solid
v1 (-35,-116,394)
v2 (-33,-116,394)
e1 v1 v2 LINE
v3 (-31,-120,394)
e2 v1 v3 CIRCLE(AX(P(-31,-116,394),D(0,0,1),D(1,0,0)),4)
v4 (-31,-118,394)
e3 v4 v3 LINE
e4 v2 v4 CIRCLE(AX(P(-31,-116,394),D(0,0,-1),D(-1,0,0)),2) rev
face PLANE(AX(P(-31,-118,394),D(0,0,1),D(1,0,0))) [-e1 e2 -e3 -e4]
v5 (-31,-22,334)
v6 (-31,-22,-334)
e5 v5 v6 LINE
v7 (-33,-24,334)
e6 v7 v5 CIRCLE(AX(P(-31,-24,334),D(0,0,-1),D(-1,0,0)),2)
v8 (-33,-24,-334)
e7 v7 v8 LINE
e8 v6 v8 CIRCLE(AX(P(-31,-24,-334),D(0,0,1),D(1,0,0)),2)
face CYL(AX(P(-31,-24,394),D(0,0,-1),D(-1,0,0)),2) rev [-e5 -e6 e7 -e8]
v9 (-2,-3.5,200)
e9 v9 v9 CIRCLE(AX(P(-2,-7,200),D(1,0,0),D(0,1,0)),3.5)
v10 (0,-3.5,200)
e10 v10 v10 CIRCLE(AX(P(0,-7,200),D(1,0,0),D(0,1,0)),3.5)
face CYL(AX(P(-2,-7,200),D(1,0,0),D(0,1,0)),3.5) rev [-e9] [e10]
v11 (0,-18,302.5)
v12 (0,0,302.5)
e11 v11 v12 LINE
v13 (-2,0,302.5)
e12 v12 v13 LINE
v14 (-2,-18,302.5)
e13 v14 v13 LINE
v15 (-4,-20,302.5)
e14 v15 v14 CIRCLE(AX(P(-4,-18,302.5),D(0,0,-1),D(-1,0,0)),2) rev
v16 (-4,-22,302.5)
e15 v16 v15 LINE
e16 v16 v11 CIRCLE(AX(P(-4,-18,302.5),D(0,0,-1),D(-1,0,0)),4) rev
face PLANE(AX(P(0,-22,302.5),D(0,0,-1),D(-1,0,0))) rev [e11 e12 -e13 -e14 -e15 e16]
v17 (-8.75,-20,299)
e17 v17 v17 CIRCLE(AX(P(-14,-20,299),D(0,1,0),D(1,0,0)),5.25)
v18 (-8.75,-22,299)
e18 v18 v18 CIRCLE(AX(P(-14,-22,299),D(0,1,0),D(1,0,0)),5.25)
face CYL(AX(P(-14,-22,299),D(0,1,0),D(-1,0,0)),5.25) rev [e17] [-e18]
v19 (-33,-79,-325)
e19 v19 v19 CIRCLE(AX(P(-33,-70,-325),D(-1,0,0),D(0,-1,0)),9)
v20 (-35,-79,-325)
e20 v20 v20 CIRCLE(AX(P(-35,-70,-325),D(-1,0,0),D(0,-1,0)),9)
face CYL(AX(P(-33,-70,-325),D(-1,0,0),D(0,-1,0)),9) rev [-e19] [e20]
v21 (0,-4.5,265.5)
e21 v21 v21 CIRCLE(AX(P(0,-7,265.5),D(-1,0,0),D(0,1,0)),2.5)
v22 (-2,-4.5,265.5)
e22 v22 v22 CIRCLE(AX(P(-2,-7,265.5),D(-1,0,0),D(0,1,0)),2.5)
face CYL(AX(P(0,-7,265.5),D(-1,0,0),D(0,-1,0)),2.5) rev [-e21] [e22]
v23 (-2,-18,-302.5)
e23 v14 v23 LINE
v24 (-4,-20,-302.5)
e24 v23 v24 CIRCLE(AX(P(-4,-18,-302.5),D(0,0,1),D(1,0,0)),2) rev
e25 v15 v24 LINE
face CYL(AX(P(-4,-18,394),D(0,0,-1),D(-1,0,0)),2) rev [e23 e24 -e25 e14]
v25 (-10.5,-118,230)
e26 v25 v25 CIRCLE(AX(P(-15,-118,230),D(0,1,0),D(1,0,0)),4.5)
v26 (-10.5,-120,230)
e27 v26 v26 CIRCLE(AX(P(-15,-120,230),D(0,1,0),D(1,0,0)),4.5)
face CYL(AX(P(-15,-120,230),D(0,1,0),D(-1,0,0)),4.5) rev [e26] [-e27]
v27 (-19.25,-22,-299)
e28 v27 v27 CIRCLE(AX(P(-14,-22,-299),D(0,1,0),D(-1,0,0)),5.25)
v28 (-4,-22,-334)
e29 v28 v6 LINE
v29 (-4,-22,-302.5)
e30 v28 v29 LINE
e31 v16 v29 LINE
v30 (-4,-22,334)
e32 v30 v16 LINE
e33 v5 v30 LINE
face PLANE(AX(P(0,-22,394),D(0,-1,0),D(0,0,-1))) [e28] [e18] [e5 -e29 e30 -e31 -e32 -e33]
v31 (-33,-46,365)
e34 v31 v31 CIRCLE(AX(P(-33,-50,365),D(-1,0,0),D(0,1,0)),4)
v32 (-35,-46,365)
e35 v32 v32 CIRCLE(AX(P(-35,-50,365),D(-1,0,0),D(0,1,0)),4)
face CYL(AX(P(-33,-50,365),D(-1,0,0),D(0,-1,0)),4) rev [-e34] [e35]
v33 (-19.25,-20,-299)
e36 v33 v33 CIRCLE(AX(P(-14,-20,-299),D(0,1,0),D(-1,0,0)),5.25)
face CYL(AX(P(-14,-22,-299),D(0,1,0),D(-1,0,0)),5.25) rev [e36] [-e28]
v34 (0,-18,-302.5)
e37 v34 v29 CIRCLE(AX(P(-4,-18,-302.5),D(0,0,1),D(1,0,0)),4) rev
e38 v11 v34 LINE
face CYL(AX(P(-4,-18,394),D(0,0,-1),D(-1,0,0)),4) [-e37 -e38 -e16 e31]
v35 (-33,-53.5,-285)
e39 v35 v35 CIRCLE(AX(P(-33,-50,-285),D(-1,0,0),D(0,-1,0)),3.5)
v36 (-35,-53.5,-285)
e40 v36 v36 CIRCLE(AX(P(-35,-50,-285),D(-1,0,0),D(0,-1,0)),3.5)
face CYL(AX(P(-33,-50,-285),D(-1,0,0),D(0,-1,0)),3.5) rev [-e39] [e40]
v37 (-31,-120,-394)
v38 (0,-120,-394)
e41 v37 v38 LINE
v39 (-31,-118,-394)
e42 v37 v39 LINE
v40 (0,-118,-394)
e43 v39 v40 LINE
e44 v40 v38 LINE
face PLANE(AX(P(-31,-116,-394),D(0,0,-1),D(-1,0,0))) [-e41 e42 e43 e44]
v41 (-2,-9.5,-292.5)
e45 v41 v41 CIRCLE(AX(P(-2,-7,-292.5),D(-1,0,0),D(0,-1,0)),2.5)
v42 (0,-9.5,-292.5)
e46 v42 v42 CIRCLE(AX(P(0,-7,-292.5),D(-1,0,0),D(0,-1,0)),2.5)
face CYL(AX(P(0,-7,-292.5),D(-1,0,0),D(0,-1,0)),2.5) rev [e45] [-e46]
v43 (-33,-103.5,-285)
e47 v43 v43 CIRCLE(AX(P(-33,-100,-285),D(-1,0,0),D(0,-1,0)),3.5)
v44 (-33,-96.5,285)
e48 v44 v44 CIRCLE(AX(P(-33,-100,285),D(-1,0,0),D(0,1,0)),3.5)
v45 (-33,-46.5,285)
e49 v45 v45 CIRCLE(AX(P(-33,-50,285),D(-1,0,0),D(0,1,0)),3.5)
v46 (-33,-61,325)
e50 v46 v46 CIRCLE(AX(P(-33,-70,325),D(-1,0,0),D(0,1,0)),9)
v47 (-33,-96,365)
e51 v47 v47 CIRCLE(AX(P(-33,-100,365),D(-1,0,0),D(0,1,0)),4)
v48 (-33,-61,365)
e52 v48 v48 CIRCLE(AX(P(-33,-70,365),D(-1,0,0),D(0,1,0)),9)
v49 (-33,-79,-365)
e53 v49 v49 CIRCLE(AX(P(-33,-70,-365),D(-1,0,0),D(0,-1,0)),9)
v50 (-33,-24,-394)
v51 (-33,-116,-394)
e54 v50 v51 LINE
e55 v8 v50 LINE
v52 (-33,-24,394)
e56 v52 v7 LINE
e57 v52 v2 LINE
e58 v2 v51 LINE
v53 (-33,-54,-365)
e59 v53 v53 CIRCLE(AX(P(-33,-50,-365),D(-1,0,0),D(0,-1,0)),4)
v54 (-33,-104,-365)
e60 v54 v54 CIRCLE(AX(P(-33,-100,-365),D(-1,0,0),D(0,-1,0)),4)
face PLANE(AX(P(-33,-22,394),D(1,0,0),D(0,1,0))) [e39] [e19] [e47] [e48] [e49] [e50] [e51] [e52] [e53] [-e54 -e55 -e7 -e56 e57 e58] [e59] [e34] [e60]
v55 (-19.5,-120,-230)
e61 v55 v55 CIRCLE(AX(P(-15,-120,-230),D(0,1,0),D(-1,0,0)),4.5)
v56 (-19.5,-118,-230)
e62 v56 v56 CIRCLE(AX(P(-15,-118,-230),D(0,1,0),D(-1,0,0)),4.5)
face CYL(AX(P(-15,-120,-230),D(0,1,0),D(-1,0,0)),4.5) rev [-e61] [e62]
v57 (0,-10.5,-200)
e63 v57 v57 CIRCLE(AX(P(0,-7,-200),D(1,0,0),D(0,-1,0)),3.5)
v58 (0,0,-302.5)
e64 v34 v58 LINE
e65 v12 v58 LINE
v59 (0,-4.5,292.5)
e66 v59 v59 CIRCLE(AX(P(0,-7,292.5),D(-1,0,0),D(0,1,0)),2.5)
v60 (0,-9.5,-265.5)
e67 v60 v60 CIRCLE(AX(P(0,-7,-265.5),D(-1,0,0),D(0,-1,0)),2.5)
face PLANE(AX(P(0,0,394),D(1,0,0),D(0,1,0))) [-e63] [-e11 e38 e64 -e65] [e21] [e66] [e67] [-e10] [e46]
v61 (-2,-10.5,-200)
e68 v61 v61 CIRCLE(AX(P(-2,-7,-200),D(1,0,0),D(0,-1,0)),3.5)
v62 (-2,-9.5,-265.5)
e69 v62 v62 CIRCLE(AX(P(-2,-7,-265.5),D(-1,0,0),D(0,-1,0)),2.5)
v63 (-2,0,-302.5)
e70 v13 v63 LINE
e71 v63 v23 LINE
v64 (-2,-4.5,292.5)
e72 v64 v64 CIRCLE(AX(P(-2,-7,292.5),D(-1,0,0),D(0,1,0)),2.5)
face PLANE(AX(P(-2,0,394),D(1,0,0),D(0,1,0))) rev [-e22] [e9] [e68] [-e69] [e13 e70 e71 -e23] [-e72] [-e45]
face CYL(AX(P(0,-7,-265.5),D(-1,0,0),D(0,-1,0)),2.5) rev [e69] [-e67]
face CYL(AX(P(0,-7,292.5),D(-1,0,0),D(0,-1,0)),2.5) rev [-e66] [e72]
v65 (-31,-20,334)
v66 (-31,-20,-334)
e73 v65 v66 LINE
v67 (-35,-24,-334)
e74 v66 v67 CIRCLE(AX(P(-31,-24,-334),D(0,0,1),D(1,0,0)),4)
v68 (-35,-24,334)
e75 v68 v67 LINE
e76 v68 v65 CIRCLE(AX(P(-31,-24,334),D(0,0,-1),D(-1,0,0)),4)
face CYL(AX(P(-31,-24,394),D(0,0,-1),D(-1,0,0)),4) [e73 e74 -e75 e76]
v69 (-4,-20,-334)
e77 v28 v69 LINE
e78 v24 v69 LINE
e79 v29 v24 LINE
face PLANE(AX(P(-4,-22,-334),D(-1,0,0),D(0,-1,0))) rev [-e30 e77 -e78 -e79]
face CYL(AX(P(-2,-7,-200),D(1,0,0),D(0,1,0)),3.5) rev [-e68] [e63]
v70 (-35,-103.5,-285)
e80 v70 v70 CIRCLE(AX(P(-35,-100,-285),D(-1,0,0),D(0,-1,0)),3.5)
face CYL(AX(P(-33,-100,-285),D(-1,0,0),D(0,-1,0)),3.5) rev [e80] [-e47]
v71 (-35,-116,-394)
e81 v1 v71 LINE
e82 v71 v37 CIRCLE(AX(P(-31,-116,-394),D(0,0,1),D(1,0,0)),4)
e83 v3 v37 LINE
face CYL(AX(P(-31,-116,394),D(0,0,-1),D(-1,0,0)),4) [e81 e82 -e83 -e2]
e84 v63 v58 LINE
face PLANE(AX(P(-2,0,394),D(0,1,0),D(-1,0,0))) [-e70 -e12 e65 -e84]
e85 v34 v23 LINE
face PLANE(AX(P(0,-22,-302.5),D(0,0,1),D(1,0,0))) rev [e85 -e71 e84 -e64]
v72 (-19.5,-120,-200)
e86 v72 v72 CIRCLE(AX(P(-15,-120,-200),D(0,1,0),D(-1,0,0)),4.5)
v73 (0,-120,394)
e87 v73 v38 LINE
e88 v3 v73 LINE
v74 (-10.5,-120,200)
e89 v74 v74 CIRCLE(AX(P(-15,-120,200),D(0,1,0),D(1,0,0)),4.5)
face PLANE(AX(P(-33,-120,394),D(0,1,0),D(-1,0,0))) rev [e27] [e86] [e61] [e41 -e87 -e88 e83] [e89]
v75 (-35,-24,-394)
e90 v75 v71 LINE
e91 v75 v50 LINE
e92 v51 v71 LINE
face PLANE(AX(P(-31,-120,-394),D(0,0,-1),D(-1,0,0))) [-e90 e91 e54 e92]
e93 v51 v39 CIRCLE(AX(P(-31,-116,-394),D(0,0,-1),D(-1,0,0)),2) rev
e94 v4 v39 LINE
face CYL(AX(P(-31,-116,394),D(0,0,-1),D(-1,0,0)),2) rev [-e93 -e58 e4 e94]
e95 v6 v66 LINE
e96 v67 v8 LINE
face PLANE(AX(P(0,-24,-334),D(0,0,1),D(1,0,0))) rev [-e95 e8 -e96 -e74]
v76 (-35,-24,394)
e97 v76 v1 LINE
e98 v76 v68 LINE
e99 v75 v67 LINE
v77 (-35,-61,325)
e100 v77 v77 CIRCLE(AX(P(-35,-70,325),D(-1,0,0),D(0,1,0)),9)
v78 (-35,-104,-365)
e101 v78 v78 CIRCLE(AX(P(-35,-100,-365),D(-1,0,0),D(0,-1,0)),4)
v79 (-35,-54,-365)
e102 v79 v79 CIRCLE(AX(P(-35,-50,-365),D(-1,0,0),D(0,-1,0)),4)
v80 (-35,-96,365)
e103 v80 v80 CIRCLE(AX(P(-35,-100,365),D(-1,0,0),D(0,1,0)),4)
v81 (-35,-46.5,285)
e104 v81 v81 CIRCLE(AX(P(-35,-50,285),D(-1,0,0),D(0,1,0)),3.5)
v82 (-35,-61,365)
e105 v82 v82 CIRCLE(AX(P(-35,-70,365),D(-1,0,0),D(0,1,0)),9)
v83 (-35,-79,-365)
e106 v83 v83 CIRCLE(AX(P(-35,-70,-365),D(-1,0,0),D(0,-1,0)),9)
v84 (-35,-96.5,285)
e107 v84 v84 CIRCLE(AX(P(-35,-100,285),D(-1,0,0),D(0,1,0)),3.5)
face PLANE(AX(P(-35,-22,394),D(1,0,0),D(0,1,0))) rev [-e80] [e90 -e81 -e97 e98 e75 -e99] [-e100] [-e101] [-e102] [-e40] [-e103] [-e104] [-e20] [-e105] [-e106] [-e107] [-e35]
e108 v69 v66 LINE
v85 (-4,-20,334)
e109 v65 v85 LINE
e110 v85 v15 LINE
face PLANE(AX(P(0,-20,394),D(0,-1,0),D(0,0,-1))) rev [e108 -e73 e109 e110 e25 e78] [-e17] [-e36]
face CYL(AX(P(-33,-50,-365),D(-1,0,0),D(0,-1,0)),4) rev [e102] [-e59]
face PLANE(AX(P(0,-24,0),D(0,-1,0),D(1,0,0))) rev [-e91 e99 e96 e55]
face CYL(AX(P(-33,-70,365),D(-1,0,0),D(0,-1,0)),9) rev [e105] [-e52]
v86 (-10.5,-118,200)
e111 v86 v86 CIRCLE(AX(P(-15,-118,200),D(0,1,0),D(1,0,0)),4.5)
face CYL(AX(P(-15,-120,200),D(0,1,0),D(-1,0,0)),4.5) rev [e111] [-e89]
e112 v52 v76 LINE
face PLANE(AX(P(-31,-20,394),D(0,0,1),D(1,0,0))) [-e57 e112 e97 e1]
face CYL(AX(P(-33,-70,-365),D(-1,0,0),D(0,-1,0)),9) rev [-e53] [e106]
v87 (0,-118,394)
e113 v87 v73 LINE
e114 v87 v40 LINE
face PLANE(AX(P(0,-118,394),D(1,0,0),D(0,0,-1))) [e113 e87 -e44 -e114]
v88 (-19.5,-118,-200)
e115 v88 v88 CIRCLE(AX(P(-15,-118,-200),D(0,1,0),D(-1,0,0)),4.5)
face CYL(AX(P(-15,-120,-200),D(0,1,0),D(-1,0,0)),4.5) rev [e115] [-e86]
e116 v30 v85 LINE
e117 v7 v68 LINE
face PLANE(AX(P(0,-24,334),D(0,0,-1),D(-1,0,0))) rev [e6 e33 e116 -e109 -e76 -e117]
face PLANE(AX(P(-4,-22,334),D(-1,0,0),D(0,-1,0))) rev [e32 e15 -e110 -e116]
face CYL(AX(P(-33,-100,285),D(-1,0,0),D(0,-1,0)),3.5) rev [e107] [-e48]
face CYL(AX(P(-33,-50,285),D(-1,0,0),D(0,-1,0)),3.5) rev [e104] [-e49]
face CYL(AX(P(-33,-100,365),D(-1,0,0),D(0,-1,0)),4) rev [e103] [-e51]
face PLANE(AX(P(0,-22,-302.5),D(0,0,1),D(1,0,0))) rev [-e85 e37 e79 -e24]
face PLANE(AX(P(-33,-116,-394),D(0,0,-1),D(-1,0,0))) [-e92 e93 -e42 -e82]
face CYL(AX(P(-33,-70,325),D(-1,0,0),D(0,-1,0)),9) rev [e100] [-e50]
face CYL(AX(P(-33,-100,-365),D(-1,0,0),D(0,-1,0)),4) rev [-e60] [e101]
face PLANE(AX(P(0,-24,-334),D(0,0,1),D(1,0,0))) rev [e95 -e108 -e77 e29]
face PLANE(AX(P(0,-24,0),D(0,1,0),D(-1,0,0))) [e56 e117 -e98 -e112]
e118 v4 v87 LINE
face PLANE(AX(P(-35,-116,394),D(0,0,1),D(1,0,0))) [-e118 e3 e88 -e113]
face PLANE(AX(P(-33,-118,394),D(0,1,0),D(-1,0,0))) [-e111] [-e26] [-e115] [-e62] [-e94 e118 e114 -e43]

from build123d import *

# Parameters (mm, degrees)
SM_BASE_FLANGE_1_DEPTH = 394
SKETCH_6_W             = 35
SKETCH_6_H             = 60
CUT_EXTRUDE_1_DEPTH    = 24
CUT_EXTRUDE_START      = -22
SKETCH_11_W            = 4
SKETCH_11_H            = 31.5
CUT_EXTRUDE_6_DEPTH    = 22
SKETCH_8_R             = 9
SKETCH_8_R_2           = 4
SKETCH_8_R_3           = 3.5
CUT_EXTRUDE_3_DEPTH    = 10
SKETCH_12_R            = 2.5
CUT_EXTRUDE_7_DEPTH    = 10
SKETCH_13_R            = 5.25
CUT_EXTRUDE_8_DEPTH    = 10
SKETCH_14_R            = 4.5
CUT_EXTRUDE_9_DEPTH    = 10
SKETCH_15_R            = 3.5
CUT_EXTRUDE_2621_DEPTH = 10


# Sheet-metal steps are written as plain solids
with BuildPart() as part:
    # Sketch 1 → Базовая кромка1 (new, symmetric)
    with BuildSketch(Plane.XY):
        with BuildLine():
            Line((0, 0), (0, -18))
            ThreePointArc((0, -18), (-1.171572875, -20.828427125), (-4, -22))
            Line((-4, -22), (-31, -22))
            ThreePointArc((-31, -22), (-32.414213562, -22.585786438), (-33, -24))
            Line((-33, -24), (-33, -116))
            ThreePointArc((-33, -116), (-32.414213562, -117.414213562), (-31, -118))
            Line((-31, -118), (0, -118))
            Line((0, -118), (0, -120))
            Line((0, -120), (-31, -120))
            ThreePointArc((-31, -120), (-33.828427125, -118.828427125), (-35, -116))
            Line((-35, -116), (-35, -24))
            ThreePointArc((-35, -24), (-33.828427125, -21.171572875), (-31, -20))
            Line((-31, -20), (-4, -20))
            ThreePointArc((-4, -20), (-2.585786438, -19.414213562), (-2, -18))
            Line((-2, -18), (-2, 0))
            Line((-2, 0), (0, 0))
        make_face()
    extrude(amount=SM_BASE_FLANGE_1_DEPTH, both=True)

    # Эскиз6 → Вырез-Вытянуть1 (cut)
    with BuildSketch(Plane(origin=(0, 0, 0), x_dir=(1, 0, 0), z_dir=(0, 1, 0))):
        with Locations((-17.5, -364)):
            Rectangle(SKETCH_6_W, SKETCH_6_H)
        with Locations((-17.5, 364)):
            Rectangle(SKETCH_6_W, SKETCH_6_H)
    extrude(amount=-CUT_EXTRUDE_1_DEPTH, mode=Mode.SUBTRACT)

    # Эскиз11 → Вырез-Вытянуть6 (cut)
    with BuildSketch(Plane(origin=(0, 0, 0), x_dir=(1, 0, 0), z_dir=(0, 1, 0)).offset(CUT_EXTRUDE_START)):
        with Locations((-2, 318.25)):
            Rectangle(SKETCH_11_W, SKETCH_11_H)
        with Locations((-2, -318.25)):
            Rectangle(SKETCH_11_W, SKETCH_11_H)
    extrude(amount=CUT_EXTRUDE_6_DEPTH, mode=Mode.SUBTRACT)

    # Эскиз8 → Вырез-Вытянуть3 (cut)
    with BuildSketch(Plane.ZY.offset(35)):
        with Locations(Location((-365, -70, 0), (0, 0, 270))):
            Circle(SKETCH_8_R)
        with Locations(Location((-325, -70, 0), (0, 0, 270))):
            Circle(SKETCH_8_R)
        with Locations(Location((-365, -50, 0), (0, 0, 270))):
            Circle(SKETCH_8_R_2)
        with Locations(Location((-365, -100, 0), (0, 0, 270))):
            Circle(SKETCH_8_R_2)
        with Locations(Location((-285, -50, 0), (0, 0, 270))):
            Circle(SKETCH_8_R_3)
        with Locations(Location((-285, -100, 0), (0, 0, 270))):
            Circle(SKETCH_8_R_3)
        with Locations(Location((285, -100, 0), (0, 0, 90))):
            Circle(SKETCH_8_R_3)
        with Locations(Location((285, -50, 0), (0, 0, 90))):
            Circle(SKETCH_8_R_3)
        with Locations(Location((365, -100, 0), (0, 0, 90))):
            Circle(SKETCH_8_R_2)
        with Locations(Location((365, -50, 0), (0, 0, 90))):
            Circle(SKETCH_8_R_2)
        with Locations(Location((325, -70, 0), (0, 0, 90))):
            Circle(SKETCH_8_R)
        with Locations(Location((365, -70, 0), (0, 0, 90))):
            Circle(SKETCH_8_R)
    extrude(amount=-CUT_EXTRUDE_3_DEPTH, mode=Mode.SUBTRACT)

    # Эскиз12 → Вырез-Вытянуть7 (cut)
    with BuildSketch(Plane.ZY.offset(2)):
        with Locations(Location((-292.5, -7, 0), (0, 0, 270))):
            Circle(SKETCH_12_R)
        with Locations(Location((-265.5, -7, 0), (0, 0, 270))):
            Circle(SKETCH_12_R)
        with Locations(Location((265.5, -7, 0), (0, 0, 90))):
            Circle(SKETCH_12_R)
        with Locations(Location((292.5, -7, 0), (0, 0, 90))):
            Circle(SKETCH_12_R)
    extrude(amount=-CUT_EXTRUDE_7_DEPTH, mode=Mode.SUBTRACT)

    # Эскиз13 → Вырез-Вытянуть8 (cut)
    with BuildSketch(Plane(origin=(0, -20, 0), x_dir=(1, 0, 0), z_dir=(0, 1, 0))):
        with Locations(Location((-14, 299, 0), (0, 0, 180))):
            Circle(SKETCH_13_R)
        with Locations((-14, -299)):
            Circle(SKETCH_13_R)
    extrude(amount=-CUT_EXTRUDE_8_DEPTH, mode=Mode.SUBTRACT)

    # Эскиз14 → Вырез-Вытянуть9 (cut)
    with BuildSketch(Plane(origin=(0, -118, 0), x_dir=(1, 0, 0), z_dir=(0, 1, 0))):
        with Locations(Location((-15, 230, 0), (0, 0, 180))):
            Circle(SKETCH_14_R)
        with Locations((-15, -230)):
            Circle(SKETCH_14_R)
        with Locations(Location((-15, 200, 0), (0, 0, 180))):
            Circle(SKETCH_14_R)
        with Locations((-15, -200)):
            Circle(SKETCH_14_R)
    extrude(amount=-CUT_EXTRUDE_9_DEPTH, mode=Mode.SUBTRACT)

    # Эскиз15 → Cut-Extrude 2621 (cut)
    with BuildSketch(Plane(origin=(0, 0, 0), x_dir=(0, 0, -1), z_dir=(1, 0, 0))):
        with Locations(Location((-200, -7, 0), (0, 0, 90))):
            Circle(SKETCH_15_R)
        with Locations(Location((200, -7, 0), (0, 0, 270))):
            Circle(SKETCH_15_R)
    extrude(amount=-CUT_EXTRUDE_2621_DEPTH, mode=Mode.SUBTRACT)


solid = part.part
